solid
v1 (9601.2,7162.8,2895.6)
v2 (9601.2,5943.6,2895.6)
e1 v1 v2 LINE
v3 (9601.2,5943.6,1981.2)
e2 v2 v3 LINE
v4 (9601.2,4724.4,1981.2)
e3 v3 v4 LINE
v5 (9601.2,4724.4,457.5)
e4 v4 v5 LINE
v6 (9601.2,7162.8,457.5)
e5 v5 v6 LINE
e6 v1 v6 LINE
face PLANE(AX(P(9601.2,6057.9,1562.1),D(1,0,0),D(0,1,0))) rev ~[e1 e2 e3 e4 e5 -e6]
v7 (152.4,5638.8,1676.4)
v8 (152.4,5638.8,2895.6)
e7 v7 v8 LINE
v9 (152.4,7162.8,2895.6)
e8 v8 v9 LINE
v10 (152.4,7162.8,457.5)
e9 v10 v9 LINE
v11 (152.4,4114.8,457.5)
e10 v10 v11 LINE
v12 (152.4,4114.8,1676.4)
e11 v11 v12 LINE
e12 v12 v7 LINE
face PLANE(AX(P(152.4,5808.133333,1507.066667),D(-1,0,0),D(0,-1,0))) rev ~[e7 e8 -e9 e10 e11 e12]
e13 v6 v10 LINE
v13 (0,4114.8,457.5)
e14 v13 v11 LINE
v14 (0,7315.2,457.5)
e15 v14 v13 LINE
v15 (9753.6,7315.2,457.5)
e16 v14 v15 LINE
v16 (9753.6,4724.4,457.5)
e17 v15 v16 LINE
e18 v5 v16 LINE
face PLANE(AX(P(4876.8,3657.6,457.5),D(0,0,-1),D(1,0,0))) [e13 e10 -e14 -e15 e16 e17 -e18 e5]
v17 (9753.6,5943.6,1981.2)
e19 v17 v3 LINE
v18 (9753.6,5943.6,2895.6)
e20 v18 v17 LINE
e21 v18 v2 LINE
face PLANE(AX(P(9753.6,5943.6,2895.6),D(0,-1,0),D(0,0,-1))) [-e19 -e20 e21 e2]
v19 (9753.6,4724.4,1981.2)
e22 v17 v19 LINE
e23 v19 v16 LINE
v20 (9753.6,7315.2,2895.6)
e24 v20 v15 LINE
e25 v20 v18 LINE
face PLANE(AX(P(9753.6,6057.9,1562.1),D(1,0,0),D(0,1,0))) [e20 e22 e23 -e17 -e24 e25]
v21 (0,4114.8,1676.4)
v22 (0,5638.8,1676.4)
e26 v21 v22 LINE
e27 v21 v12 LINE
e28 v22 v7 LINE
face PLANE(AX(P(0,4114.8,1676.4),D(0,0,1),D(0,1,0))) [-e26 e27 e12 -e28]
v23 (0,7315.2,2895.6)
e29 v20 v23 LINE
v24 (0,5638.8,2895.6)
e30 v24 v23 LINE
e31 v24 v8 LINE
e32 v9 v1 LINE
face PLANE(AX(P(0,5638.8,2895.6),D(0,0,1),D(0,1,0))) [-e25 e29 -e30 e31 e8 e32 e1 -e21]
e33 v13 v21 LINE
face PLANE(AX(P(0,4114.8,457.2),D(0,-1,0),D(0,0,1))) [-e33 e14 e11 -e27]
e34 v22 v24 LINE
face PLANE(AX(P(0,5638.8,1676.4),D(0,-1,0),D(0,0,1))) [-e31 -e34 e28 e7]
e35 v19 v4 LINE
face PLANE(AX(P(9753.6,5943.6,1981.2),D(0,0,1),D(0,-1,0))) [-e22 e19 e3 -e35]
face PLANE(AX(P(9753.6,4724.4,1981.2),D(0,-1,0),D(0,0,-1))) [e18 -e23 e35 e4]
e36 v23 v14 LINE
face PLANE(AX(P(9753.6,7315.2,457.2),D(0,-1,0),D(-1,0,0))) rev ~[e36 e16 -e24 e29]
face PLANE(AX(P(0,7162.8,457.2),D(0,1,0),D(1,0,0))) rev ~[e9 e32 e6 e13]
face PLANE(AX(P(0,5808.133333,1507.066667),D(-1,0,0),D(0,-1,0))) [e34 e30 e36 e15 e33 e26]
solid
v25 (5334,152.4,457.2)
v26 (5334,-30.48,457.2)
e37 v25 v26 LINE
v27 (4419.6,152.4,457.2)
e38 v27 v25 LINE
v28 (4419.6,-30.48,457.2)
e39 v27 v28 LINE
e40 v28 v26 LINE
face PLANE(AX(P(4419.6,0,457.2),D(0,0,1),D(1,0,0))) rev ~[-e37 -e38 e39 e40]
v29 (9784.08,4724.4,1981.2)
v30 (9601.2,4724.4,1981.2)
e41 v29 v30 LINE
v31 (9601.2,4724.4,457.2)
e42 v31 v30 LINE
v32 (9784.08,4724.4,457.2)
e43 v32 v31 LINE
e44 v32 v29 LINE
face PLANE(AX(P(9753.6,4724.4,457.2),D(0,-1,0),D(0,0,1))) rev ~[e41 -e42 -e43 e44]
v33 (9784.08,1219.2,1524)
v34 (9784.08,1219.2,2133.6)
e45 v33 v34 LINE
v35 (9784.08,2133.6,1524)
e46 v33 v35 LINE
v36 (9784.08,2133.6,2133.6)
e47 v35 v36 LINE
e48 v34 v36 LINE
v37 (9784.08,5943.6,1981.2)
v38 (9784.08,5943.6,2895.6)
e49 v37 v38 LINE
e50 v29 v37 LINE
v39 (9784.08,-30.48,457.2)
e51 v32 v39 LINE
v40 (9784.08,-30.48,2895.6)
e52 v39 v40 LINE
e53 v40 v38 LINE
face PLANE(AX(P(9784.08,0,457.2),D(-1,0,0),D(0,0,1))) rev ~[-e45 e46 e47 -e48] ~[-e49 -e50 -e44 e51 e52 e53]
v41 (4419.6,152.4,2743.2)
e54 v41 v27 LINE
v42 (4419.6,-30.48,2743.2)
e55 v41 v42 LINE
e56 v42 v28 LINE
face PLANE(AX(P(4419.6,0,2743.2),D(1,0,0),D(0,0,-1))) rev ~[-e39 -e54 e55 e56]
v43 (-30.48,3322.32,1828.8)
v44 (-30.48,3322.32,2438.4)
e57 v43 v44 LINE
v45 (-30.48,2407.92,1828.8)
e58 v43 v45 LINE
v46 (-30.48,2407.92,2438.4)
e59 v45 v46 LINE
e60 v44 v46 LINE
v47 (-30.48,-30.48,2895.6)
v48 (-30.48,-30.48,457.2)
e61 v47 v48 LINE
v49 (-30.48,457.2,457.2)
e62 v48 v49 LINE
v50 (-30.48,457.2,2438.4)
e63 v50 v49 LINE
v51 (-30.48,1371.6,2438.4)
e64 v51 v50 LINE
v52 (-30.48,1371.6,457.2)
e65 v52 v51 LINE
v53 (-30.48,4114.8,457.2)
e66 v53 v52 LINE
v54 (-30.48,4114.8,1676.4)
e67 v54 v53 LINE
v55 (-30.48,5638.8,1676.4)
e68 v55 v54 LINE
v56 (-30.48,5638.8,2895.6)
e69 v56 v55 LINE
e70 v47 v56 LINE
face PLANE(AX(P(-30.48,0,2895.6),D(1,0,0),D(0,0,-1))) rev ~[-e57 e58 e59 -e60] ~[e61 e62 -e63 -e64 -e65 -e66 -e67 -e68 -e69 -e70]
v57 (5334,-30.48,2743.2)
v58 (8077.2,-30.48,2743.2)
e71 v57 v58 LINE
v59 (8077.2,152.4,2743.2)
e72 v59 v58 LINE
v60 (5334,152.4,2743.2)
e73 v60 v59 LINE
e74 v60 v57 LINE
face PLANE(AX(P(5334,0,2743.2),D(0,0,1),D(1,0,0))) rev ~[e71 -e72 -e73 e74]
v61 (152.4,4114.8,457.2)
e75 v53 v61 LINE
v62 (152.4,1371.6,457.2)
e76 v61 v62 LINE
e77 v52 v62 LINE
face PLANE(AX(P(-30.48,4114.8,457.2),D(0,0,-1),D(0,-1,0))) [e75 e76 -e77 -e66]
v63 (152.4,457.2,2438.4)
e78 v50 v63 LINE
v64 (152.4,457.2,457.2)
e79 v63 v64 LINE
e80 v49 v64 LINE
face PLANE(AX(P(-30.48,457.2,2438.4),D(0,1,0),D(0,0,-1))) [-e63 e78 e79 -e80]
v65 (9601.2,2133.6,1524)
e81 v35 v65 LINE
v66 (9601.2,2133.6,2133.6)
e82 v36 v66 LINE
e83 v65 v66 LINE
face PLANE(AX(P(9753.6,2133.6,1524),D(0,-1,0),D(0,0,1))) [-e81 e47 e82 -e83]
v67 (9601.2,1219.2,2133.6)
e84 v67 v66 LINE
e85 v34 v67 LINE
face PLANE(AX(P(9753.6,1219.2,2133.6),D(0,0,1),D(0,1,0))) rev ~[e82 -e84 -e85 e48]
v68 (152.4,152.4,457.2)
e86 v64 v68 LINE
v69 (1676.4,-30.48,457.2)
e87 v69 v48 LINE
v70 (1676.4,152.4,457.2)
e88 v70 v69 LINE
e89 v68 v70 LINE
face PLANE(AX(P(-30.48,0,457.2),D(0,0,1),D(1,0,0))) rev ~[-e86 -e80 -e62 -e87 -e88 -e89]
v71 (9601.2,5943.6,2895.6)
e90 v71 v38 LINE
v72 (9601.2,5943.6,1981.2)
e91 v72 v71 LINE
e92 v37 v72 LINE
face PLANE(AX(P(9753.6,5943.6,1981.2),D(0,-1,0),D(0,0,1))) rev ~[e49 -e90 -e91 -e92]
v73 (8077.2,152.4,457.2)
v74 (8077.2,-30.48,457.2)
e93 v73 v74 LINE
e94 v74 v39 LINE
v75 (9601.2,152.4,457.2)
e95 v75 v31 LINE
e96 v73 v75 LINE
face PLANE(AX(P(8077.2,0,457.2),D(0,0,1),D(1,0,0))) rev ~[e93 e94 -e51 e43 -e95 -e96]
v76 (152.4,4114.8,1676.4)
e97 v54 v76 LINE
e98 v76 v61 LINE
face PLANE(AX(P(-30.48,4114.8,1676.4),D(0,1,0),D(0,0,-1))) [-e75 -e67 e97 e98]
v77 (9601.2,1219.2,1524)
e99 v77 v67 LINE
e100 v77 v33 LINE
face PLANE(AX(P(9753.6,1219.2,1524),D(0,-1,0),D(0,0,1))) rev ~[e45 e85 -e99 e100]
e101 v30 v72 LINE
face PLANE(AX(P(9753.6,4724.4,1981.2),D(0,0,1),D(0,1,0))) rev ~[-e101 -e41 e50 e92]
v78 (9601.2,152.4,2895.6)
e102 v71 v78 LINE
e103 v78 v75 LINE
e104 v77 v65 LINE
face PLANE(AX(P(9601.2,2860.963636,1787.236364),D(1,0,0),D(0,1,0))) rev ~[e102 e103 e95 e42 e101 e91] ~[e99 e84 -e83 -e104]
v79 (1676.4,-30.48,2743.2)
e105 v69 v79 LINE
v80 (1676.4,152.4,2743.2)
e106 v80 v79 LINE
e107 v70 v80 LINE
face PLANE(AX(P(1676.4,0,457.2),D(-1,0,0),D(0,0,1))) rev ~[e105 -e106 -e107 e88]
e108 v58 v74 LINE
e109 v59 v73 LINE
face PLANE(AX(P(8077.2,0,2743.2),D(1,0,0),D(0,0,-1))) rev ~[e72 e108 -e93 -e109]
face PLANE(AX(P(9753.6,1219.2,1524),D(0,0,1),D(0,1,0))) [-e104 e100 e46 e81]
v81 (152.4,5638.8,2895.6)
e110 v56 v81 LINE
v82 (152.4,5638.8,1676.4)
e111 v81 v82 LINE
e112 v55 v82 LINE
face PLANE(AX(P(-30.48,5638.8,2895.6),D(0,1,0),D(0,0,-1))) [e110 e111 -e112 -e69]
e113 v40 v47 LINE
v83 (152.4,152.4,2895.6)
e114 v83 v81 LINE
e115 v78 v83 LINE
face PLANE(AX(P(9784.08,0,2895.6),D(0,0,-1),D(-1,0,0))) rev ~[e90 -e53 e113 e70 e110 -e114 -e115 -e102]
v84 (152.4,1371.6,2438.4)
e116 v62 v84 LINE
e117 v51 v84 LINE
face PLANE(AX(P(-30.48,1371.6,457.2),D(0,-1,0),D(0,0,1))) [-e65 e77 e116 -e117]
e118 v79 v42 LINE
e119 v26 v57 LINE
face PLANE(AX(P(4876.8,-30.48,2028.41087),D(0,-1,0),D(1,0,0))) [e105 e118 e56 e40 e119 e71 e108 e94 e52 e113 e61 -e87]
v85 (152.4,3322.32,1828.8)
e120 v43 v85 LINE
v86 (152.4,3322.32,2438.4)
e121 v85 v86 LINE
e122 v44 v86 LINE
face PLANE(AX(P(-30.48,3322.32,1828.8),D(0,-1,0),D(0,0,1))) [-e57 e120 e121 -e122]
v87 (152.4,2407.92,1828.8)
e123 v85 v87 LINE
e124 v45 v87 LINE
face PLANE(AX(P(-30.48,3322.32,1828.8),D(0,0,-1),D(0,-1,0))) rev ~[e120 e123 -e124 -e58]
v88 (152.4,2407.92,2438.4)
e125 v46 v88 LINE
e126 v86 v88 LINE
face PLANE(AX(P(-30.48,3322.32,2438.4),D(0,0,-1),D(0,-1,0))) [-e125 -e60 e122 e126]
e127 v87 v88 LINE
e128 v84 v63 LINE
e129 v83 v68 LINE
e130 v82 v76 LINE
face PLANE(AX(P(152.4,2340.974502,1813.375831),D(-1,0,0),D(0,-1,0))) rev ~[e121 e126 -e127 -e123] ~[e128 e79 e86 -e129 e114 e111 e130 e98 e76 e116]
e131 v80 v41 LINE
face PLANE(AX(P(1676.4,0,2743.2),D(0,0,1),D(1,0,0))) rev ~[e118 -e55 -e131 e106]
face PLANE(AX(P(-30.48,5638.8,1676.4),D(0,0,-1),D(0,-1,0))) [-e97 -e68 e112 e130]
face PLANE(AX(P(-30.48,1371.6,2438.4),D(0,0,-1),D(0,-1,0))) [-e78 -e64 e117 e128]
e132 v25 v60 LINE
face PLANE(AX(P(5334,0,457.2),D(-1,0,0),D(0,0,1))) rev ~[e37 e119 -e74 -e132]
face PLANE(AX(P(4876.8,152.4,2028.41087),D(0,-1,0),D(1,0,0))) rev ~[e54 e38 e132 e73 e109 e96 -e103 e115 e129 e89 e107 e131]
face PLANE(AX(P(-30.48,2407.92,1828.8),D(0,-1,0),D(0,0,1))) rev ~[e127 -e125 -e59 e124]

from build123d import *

# Parameters (mm, degrees)
F0_W           = 9753.6
F0_H           = 7315.2
F1_DEPTH       = 304.8
F2_W           = 914.4
F2_H           = 152.4
F3_DEPTH       = 152.4
F5_DEPTH       = 2438.4
F7_DEPTH       = 152.4
F9_DEPTH       = 152.4
F10_W          = 914.4
F10_H          = 609.6
F11_DEPTH      = 152.4
F11_DEPTH_BACK = 30.48
F13_DEPTH      = 152.4
F13_DEPTH_BACK = 30.48
F14_W          = 914.4
F14_H          = 609.6
F15_DEPTH      = 182.88
F16_W          = 9753.6
F16_H          = 7315.2
F17_DEPTH      = 457.5


with BuildPart() as f1:
    # F0 (on Top) → F1 (new body)
    with BuildSketch(Plane.XY):
        with Locations((4876.8, 3657.6)):
            Rectangle(F0_W, F0_H)
    extrude(amount=F1_DEPTH)

    # F2 (on face) → F3 (join)
    with BuildSketch(Plane.XY.offset(304.8)):
        with Locations((4876.8, 76.2)):
            Rectangle(F2_W, F2_H)
        Polygon((8077.2, 152.4), (8077.2, 0), (9753.6, 0), (9753.6, 7315.2), (0, 7315.2), (0, 1371.6), (152.4, 1371.6), (152.4, 7162.8), (9601.2, 7162.8), (9601.2, 152.4), align=None)
        Polygon((0, 0), (1676.4, 0), (1676.4, 152.4), (152.4, 152.4), (152.4, 457.2), (0, 457.2), align=None)
    extrude(amount=F3_DEPTH)

    # F4 (on face) → F5 (join)
    with BuildSketch(Plane.XY.offset(457.2)):
        Polygon((0, 7315.2), (0, 7162.8), (9601.2, 7162.8), (9753.6, 7162.8), (9753.6, 7315.2), align=None)
    extrude(amount=F5_DEPTH)

    # F6 (on face) → F7 (join)
    with BuildSketch(Plane.YZ.offset(9753.6)):
        Polygon((4724.4, 1981.2), (4724.4, 457.2), (7162.8, 457.2), (7162.8, 2895.6), (5943.6, 2895.6), (5943.6, 1981.2), align=None)
    extrude(amount=-F7_DEPTH)

    # F8 (on face) → F9 (join)
    with BuildSketch(Plane(origin=(0, 0, 0), x_dir=(0, -1, 0), z_dir=(-1, 0, 0))):
        Polygon((-7162.8, 457.2), (-4114.8, 457.2), (-4114.8, 1676.4), (-5638.8, 1676.4), (-5638.8, 2895.6), (-7162.8, 2895.6), align=None)
    extrude(amount=-F9_DEPTH)

    # F16 (on face) → F17 (cut)
    with BuildSketch(Plane(origin=(0, 0, 0), x_dir=(1, 0, 0), z_dir=(0, 0, -1))):
        with Locations((4876.8, -3657.6)):
            Rectangle(F16_W, F16_H)
    extrude(amount=-F17_DEPTH, mode=Mode.SUBTRACT)


with BuildPart() as f11:
    # F10 (on face) → F11 (new body, two sides)
    with BuildSketch(Plane.YZ.offset(9753.6)) as f11_sk:
        Polygon((5943.6, 1981.2), (5943.6, 2895.6), (0, 2895.6), (0, 457.2), (4724.4, 457.2), (4724.4, 1981.2), align=None)
        with Locations((1676.4, 1828.8)):
            Rectangle(F10_W, F10_H, mode=Mode.SUBTRACT)
    extrude(amount=-F11_DEPTH)
    extrude(f11_sk.sketch, amount=F11_DEPTH_BACK)

    # F12 (on face) → F13 (join, two sides)
    with BuildSketch(Plane.XZ) as f13_sk:
        Polygon((-30.48, 457.2), (0, 457.2), (1676.4, 457.2), (1676.4, 2743.2), (4419.6, 2743.2), (4419.6, 457.2), (5334, 457.2), (5334, 2743.2), (8077.2, 2743.2), (8077.2, 457.2), (9601.2, 457.2), (9753.6, 457.2), (9784.08, 457.2), (9784.08, 2895.6), (9601.2, 2895.6), (152.4, 2895.6), (-30.48, 2895.6), align=None)
    extrude(amount=-F13_DEPTH)
    extrude(f13_sk.sketch, amount=F13_DEPTH_BACK)

    # F14 (on face) → F15 (join)
    with BuildSketch(Plane(origin=(-30.48, 0, 0), x_dir=(0, -1, 0), z_dir=(-1, 0, 0))):
        Polygon((30.48, 2895.6), (-5638.8, 2895.6), (-5638.8, 1676.4), (-4114.8, 1676.4), (-4114.8, 457.2), (-1371.6, 457.2), (-1371.6, 2438.4), (-457.2, 2438.4), (-457.2, 457.2), (30.48, 457.2), align=None)
        with Locations((-2865.12, 2133.6)):
            Rectangle(F14_W, F14_H, mode=Mode.SUBTRACT)
    extrude(amount=-F15_DEPTH)


solid = Compound([f1.part, f11.part])
